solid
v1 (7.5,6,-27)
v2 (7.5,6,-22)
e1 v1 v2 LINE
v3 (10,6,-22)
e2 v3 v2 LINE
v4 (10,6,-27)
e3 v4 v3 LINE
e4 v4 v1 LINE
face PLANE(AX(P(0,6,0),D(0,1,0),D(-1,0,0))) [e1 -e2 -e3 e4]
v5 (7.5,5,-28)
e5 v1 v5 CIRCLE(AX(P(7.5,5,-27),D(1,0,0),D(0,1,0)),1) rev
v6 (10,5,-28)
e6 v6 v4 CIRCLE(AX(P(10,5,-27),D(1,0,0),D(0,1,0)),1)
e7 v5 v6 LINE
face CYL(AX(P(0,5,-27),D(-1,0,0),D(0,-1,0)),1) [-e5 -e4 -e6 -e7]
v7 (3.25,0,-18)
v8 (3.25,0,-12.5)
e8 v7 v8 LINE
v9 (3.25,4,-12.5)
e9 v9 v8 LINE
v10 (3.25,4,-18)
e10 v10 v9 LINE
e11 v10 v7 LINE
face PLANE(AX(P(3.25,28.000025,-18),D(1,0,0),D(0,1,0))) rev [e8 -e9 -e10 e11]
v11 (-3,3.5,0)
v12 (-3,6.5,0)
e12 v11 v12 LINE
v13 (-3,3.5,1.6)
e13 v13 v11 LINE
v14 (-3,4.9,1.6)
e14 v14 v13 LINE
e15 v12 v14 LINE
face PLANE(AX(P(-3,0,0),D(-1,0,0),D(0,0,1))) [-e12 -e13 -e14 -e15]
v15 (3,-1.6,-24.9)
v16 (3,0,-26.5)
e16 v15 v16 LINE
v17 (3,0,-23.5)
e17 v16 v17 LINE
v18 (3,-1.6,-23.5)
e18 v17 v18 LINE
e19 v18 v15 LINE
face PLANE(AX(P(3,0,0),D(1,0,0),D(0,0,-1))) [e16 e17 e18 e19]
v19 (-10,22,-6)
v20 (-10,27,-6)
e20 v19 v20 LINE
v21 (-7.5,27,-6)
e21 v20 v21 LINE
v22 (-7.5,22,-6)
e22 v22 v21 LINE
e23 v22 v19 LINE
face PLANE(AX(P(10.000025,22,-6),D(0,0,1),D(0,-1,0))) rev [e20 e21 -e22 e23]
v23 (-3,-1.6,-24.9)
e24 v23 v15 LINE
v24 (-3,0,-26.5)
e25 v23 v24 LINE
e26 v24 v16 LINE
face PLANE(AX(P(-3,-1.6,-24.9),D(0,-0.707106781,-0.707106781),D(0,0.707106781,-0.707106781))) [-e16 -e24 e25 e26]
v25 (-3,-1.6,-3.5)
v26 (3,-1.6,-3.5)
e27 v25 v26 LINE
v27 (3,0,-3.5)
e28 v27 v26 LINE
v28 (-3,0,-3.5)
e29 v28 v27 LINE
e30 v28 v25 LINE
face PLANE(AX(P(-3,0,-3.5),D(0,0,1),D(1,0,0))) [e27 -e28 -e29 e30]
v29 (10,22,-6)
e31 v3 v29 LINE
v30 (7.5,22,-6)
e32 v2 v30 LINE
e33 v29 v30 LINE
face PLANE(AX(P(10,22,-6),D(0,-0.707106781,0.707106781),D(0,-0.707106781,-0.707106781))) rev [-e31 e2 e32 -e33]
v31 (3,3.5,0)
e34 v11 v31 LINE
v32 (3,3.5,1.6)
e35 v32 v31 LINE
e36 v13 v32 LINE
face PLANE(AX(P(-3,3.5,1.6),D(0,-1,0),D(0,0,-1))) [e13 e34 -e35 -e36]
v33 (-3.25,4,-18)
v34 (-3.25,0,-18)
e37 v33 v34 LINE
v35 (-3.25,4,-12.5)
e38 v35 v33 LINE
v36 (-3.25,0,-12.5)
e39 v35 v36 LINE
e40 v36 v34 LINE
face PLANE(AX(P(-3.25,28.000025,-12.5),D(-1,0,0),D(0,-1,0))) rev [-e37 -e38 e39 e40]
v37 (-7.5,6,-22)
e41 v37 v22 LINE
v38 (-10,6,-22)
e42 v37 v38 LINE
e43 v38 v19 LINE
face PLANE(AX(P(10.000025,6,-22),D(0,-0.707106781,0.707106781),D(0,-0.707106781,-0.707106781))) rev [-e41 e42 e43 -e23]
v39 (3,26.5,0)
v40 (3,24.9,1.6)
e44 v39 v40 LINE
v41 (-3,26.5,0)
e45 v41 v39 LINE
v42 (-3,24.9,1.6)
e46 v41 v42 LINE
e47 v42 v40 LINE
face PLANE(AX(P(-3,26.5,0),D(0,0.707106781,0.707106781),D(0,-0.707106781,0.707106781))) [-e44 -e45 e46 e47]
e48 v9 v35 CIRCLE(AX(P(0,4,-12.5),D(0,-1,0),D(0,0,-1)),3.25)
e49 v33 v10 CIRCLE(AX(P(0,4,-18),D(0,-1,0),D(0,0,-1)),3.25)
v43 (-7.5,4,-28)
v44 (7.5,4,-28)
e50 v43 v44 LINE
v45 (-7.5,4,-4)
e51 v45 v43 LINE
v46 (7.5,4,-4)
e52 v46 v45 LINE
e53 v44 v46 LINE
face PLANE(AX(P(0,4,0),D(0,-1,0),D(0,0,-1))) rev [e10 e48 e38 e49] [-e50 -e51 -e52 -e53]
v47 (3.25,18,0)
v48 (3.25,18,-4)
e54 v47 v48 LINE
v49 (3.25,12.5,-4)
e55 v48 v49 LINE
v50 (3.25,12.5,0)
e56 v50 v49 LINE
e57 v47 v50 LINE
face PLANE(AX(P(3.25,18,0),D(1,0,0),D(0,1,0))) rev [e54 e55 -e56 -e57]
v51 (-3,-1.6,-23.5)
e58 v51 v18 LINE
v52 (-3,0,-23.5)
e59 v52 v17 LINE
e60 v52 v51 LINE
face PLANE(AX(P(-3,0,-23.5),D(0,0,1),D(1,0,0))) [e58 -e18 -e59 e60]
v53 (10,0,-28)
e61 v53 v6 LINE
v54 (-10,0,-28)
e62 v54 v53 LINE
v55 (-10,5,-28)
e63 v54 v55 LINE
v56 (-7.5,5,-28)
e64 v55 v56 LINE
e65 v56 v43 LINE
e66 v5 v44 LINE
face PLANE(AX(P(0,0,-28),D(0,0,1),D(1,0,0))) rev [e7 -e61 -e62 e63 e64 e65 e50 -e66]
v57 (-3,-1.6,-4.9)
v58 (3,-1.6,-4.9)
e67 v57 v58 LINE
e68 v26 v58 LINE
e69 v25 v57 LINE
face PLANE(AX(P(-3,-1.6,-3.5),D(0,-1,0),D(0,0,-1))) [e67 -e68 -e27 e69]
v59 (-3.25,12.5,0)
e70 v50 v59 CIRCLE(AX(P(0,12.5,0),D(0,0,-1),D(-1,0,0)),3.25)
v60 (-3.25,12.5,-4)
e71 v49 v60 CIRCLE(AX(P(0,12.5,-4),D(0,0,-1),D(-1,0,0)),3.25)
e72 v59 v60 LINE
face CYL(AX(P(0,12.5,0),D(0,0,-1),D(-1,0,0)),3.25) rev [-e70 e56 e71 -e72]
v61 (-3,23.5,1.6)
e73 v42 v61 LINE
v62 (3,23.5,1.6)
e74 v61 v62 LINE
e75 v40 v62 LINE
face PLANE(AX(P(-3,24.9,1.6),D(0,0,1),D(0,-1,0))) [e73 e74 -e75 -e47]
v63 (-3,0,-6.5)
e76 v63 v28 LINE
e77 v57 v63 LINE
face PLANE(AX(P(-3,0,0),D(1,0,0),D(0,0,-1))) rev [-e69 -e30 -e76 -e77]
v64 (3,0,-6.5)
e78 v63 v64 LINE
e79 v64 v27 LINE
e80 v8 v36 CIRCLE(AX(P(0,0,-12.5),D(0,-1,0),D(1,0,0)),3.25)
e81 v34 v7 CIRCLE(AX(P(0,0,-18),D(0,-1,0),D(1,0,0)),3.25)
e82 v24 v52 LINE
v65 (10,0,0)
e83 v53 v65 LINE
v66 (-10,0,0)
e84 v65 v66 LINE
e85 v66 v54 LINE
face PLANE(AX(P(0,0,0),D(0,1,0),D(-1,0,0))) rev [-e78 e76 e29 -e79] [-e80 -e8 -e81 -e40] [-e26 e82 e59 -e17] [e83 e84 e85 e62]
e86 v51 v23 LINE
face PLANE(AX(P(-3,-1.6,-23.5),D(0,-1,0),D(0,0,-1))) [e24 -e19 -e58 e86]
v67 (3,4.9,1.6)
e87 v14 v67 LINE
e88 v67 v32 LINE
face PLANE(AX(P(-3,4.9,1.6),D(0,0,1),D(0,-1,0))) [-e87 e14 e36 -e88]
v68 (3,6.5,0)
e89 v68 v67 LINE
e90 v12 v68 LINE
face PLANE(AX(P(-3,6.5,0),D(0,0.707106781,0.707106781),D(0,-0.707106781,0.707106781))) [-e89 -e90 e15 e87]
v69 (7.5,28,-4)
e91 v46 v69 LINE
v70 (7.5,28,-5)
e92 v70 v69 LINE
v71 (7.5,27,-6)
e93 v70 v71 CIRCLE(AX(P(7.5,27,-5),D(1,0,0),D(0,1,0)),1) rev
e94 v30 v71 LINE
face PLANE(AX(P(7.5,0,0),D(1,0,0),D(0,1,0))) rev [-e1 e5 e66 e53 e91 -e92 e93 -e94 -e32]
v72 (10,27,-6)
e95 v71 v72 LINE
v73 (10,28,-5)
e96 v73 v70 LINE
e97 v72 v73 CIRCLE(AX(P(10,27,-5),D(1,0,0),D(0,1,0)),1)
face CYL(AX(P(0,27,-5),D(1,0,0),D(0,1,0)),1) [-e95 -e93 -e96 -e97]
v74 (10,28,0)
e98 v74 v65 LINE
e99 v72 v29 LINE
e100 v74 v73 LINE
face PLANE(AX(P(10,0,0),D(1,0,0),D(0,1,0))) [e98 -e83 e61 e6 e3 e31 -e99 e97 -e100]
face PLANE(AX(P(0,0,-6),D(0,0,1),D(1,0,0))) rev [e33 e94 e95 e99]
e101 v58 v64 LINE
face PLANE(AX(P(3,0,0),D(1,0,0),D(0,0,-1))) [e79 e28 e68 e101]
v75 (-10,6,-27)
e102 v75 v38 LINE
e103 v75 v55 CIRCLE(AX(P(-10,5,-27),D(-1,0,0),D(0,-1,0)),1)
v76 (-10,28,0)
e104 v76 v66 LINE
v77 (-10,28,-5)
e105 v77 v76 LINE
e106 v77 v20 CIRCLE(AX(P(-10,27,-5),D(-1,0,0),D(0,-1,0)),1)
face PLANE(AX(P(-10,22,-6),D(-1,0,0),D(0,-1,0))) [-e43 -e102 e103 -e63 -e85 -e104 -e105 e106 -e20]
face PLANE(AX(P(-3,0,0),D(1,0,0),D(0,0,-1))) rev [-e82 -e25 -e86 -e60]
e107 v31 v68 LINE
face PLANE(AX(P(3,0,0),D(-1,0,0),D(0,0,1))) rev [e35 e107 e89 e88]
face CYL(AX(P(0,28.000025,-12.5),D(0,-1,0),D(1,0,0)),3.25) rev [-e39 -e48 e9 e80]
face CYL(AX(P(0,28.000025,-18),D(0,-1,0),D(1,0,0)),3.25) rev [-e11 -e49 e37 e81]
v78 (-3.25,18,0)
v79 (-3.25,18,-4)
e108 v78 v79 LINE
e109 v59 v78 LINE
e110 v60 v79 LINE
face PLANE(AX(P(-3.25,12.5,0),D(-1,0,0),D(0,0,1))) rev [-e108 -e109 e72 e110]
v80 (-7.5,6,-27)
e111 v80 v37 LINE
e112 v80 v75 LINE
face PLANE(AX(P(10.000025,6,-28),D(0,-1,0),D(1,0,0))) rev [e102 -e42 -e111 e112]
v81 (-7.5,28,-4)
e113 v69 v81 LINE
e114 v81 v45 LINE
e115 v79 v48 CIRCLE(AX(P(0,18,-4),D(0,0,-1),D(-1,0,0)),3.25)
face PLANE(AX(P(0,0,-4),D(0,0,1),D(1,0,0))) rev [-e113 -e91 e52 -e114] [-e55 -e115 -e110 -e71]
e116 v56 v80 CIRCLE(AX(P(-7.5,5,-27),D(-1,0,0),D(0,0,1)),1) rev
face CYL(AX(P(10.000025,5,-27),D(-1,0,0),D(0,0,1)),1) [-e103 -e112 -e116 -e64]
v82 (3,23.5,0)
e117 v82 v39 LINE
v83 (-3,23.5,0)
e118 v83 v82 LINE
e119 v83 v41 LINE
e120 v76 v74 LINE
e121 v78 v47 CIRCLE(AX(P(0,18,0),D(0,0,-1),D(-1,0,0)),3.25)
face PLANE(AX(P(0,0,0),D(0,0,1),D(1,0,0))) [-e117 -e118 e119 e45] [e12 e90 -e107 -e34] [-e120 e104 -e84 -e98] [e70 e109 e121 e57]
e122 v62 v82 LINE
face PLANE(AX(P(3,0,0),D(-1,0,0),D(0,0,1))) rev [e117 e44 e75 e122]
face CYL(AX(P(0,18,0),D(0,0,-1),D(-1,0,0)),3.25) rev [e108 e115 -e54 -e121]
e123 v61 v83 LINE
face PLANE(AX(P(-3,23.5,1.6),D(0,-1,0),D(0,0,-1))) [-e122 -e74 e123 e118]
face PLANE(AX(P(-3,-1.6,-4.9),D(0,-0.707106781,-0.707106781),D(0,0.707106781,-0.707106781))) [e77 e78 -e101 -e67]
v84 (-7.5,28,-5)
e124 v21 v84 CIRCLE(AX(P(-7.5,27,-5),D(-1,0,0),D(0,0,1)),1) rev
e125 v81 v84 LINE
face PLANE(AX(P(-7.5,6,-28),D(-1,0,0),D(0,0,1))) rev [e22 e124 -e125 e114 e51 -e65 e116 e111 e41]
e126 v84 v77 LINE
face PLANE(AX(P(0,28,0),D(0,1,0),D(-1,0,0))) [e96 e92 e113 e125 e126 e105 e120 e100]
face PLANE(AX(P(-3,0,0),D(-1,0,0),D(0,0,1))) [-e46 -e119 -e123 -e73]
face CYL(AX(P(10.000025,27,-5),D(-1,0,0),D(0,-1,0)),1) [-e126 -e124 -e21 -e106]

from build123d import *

# Parameters (mm, degrees)
SKETCH1_W           = 17.5
SKETCH1_H           = 16
BOSS_EXTRUDE1_DEPTH = 6
SKETCH2_W           = 2.5
SKETCH2_H           = 16
BOSS_EXTRUDE2_DEPTH = 22
BOSS_EXTRUDE3_DEPTH = 2.5
BOSS_EXTRUDE4_DEPTH = 6
SKETCH5_W           = 20
SKETCH5_H           = 28
BOSS_EXTRUDE5_DEPTH = 6
CUT_EXTRUDE1_REACH  = 40.21
SKETCH7_W           = 15
SKETCH7_H           = 22
CUT_EXTRUDE2_REACH  = 40.21
SKETCH9_W           = 15
SKETCH9_H           = 24
CUT_EXTRUDE3_DEPTH  = 45.362146026
CUT_EXTRUDE4_DEPTH  = 39.209946349
CUT_EXTRUDE5_DEPTH  = 41.841155713
BOSS_EXTRUDE6_DEPTH = 6
BOSS_EXTRUDE7_DEPTH = 6
BOSS_EXTRUDE8_DEPTH = 6
BOSS_EXTRUDE9_DEPTH = 6
FILLET1_R           = 1


with BuildPart() as part:
    # Sketch1 → Boss-Extrude1 (new body)
    with BuildSketch(Plane.XY):
        with Locations((-1.25, 14)):
            Rectangle(SKETCH1_W, SKETCH1_H)
    extrude(amount=-BOSS_EXTRUDE1_DEPTH)

    # Sketch2 → Boss-Extrude2 (add)
    with BuildSketch(Plane(origin=(0, 0, -6), x_dir=(-1, 0, 0), z_dir=(0, 0, -1))):
        with Locations((8.75, 14)):
            Rectangle(SKETCH2_W, SKETCH2_H)
    extrude(amount=BOSS_EXTRUDE2_DEPTH)

    # Sketch3 → Boss-Extrude3 (add)
    with BuildSketch(Plane(origin=(7.5, 0, 0), x_dir=(0, 0, -1), z_dir=(1, 0, 0))):
        Polygon((6, 22), (22, 6), (0, 6), (0, 22), align=None)
    extrude(amount=BOSS_EXTRUDE3_DEPTH)

    # Sketch4 → Boss-Extrude4 (add)
    with BuildSketch(Plane(origin=(0, 22, 0), x_dir=(-1, 0, 0), z_dir=(0, 1, 0))):
        Polygon((7.5, -6), (-10, -6), (-10, 0), (10, 0), (10, -28), (7.5, -28), align=None)
    extrude(amount=BOSS_EXTRUDE4_DEPTH)

    # Sketch5 → Boss-Extrude5 (add)
    with BuildSketch(Plane.XZ.offset(-6)):
        with Locations((0, -14)):
            Rectangle(SKETCH5_W, SKETCH5_H)
    extrude(amount=BOSS_EXTRUDE5_DEPTH)

    # Sketch7 → Cut-Extrude1 (cut, up to next)
    with BuildSketch(Plane.XY.offset(-4), mode=Mode.PRIVATE) as cut_extrude1_sk1:
        with Locations((0, 17)):
            Rectangle(SKETCH7_W, SKETCH7_H)
    cut_extrude1_tool1 = extrude(cut_extrude1_sk1.sketch, amount=-CUT_EXTRUDE1_REACH, mode=Mode.PRIVATE) & part.part
    add(cut_extrude1_tool1.solids().sort_by_distance((0, 17, -4))[0], mode=Mode.SUBTRACT)

    # Sketch9 → Cut-Extrude2 (cut, up to next)
    with BuildSketch(Plane.XZ.offset(-4), mode=Mode.PRIVATE) as cut_extrude2_sk1:
        with Locations((0, -16)):
            Rectangle(SKETCH9_W, SKETCH9_H)
    cut_extrude2_tool1 = extrude(cut_extrude2_sk1.sketch, amount=-CUT_EXTRUDE2_REACH, mode=Mode.PRIVATE) & part.part
    add(cut_extrude2_tool1.solids().sort_by_distance((0, 4, -16))[0], mode=Mode.SUBTRACT)

    # Sketch10 → Cut-Extrude3 (cut, through all)
    with BuildSketch(Plane.ZY.offset(10)):
        Polygon((-28, 28), (-28, 6), (-22, 6), (-6, 22), (-6, 28), align=None)
    extrude(amount=-CUT_EXTRUDE3_DEPTH, mode=Mode.SUBTRACT)

    # Sketch11 → Cut-Extrude4 (cut, through all)
    with BuildSketch(Plane(origin=(0, 0, -4), x_dir=(-1, 0, 0), z_dir=(0, 0, -1))):
        with BuildLine():
            Line((3.25, 12.5), (3.25, 18))
            ThreePointArc((3.25, 18), (0, 21.25), (-3.25, 18))
            Line((-3.25, 18), (-3.25, 12.5))
            ThreePointArc((-3.25, 12.5), (0, 9.25), (3.25, 12.5))
        make_face()
    extrude(amount=-CUT_EXTRUDE4_DEPTH, mode=Mode.SUBTRACT)

    # Sketch12 → Cut-Extrude5 (cut, through all)
    with BuildSketch(Plane.XZ):
        with BuildLine():
            Line((3.25, -18), (3.25, -12.5))
            ThreePointArc((3.25, -12.5), (0, -9.25), (-3.25, -12.5))
            Line((-3.25, -12.5), (-3.25, -18))
            ThreePointArc((-3.25, -18), (0, -21.25), (3.25, -18))
        make_face()
    extrude(amount=-CUT_EXTRUDE5_DEPTH, mode=Mode.SUBTRACT)

    # Sketch13 → Boss-Extrude6 (add)
    with BuildSketch(Plane(origin=(3, 0, 0), x_dir=(0, 0, -1), z_dir=(1, 0, 0))):
        Polygon((0, 26.5), (-1.6, 24.9), (-1.6, 23.5), (0, 23.5), align=None)
    extrude(amount=-BOSS_EXTRUDE6_DEPTH)

    # Sketch14 → Boss-Extrude7 (add)
    with BuildSketch(Plane(origin=(3, 0, 0), x_dir=(0, 0, -1), z_dir=(1, 0, 0))):
        Polygon((0, 6.5), (-1.6, 4.9), (-1.6, 3.5), (0, 3.5), align=None)
    extrude(amount=-BOSS_EXTRUDE7_DEPTH)

    # Sketch15 → Boss-Extrude8 (add)
    with BuildSketch(Plane(origin=(3, 0, 0), x_dir=(0, 0, -1), z_dir=(1, 0, 0))):
        Polygon((23.5, 0), (23.5, -1.6), (24.9, -1.6), (26.5, 0), align=None)
    extrude(amount=-BOSS_EXTRUDE8_DEPTH)

    # Sketch16 → Boss-Extrude9 (add)
    with BuildSketch(Plane(origin=(3, 0, 0), x_dir=(0, 0, -1), z_dir=(1, 0, 0))):
        Polygon((3.5, 0), (3.5, -1.6), (4.9, -1.6), (6.5, 0), align=None)
    extrude(amount=-BOSS_EXTRUDE9_DEPTH)

    # Fillet1
    fillet1_edges = [part.edges().sort_by_distance(p)[0] for p in [
        (-8.75, 6, -28),
        (8.75, 28, -6),
        (8.75, 6, -28),
        (-8.75, 28, -6),
    ]]
    fillet(fillet1_edges, radius=FILLET1_R)


solid = part.part
